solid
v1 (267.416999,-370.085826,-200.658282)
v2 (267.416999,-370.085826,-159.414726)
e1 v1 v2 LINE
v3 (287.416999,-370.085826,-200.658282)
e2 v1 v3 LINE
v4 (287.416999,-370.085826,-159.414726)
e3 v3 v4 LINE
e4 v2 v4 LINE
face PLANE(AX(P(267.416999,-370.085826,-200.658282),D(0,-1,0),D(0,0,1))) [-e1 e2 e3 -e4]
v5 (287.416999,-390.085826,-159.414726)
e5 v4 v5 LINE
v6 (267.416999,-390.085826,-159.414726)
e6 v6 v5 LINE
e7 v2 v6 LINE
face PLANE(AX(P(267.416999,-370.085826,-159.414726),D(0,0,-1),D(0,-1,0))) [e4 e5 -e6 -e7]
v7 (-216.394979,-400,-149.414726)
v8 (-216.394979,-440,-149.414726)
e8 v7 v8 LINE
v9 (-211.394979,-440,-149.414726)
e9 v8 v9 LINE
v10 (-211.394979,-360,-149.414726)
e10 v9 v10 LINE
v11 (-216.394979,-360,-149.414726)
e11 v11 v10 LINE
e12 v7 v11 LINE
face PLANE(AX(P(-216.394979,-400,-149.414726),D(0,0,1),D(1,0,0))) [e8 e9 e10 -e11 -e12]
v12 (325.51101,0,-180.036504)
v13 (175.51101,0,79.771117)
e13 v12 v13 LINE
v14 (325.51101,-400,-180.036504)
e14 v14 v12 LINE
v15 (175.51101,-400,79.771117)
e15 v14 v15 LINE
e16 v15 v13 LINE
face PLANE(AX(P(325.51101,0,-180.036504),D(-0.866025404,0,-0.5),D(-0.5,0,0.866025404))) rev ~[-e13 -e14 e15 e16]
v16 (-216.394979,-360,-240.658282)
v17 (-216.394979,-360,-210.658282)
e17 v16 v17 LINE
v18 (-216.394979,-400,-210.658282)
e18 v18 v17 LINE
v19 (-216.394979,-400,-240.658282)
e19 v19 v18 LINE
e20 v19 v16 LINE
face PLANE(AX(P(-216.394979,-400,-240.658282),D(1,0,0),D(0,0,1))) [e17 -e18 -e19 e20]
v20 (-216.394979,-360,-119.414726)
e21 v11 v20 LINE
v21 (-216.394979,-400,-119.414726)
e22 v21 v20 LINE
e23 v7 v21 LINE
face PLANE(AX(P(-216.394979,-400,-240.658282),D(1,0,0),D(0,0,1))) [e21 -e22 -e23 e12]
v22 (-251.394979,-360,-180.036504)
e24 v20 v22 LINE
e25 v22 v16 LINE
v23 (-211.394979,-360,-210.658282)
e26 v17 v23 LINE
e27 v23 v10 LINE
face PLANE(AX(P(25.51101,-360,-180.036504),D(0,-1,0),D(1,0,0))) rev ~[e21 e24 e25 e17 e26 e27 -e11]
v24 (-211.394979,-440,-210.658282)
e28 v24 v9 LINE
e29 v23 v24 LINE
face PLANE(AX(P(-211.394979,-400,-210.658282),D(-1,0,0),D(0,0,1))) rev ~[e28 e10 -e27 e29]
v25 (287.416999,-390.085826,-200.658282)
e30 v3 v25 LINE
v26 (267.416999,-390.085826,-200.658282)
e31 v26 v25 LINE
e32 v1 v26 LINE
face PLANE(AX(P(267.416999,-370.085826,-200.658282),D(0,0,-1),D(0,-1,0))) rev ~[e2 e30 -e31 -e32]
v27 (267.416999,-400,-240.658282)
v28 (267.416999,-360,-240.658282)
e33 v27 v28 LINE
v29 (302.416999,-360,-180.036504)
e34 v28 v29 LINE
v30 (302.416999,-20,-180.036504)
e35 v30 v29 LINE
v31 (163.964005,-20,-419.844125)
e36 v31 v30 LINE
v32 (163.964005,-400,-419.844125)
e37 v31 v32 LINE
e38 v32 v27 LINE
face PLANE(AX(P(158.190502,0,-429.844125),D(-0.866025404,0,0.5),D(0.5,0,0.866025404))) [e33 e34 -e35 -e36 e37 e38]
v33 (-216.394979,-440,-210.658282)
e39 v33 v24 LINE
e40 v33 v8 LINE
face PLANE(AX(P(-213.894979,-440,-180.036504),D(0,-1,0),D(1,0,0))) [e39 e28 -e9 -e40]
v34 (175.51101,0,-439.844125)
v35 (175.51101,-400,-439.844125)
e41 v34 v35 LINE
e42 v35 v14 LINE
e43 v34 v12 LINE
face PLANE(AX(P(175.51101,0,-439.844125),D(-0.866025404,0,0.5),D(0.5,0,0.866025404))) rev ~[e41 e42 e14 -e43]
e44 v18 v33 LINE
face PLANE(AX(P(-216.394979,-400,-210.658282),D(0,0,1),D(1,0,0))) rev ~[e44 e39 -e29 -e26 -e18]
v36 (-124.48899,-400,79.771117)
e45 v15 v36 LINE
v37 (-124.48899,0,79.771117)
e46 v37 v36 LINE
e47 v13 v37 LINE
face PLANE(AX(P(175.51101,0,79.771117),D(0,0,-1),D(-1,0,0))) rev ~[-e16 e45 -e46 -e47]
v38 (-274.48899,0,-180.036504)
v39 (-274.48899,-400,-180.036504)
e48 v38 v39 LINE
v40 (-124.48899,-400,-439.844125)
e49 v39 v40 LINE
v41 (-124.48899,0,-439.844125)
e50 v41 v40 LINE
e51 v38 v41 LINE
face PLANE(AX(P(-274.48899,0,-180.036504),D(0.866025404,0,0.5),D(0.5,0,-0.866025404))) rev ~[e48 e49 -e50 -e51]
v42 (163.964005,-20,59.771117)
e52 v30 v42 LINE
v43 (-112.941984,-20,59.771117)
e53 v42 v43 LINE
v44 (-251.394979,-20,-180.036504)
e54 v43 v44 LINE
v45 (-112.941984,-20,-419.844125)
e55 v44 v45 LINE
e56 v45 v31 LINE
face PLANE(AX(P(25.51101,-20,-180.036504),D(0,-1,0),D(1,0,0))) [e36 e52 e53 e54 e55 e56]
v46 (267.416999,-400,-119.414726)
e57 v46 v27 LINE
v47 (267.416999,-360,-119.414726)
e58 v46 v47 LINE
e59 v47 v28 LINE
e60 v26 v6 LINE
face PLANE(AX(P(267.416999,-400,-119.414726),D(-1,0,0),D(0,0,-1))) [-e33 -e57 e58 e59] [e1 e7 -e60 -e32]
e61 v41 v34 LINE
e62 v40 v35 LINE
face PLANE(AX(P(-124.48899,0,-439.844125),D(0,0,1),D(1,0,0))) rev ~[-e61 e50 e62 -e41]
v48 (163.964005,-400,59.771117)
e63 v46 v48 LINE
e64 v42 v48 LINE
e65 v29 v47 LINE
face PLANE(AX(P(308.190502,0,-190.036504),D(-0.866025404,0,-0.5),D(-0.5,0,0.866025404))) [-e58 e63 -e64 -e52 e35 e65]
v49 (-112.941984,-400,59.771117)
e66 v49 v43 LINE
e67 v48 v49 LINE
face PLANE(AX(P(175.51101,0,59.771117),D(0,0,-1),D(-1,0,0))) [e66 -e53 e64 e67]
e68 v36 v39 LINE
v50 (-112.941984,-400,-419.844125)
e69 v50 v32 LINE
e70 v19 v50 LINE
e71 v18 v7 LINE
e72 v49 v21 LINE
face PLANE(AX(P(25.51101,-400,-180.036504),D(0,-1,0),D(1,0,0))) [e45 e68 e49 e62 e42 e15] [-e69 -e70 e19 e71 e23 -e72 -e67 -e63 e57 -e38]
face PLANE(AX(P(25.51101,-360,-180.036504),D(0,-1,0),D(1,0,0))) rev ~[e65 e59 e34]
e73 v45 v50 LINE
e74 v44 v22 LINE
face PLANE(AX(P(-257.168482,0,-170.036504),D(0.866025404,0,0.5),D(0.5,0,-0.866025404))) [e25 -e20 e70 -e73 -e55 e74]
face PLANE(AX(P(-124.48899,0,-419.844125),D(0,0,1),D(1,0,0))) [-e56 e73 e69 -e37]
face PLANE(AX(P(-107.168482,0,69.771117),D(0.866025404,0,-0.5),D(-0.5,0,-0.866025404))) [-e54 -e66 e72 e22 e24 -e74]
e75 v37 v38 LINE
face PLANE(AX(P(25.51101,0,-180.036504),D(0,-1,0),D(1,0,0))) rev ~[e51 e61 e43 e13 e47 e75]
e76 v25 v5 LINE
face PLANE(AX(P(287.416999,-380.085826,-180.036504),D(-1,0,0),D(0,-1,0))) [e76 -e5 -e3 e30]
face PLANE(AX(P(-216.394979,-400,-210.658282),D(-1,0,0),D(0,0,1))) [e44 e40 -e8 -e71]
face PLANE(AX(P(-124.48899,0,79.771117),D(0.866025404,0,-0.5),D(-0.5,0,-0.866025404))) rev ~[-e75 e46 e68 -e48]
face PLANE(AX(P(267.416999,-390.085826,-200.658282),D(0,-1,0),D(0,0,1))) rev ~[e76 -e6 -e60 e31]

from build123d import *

# Parameters (mm, degrees)
F1_DEPTH  = 400
F2_T      = -20
F4_DEPTH  = 40
F5_W      = 40
F5_H      = 61.2435565298
F6_DEPTH  = 5
F7_W      = 5
F7_H      = 61.2435565298
F8_DEPTH  = 40
F9_W      = 20
F9_H      = 41.2435565298
F10_DEPTH = 20


with BuildPart() as f1:
    # F0 (on Front) → F1 (new body)
    with BuildSketch(Plane.XZ):
        Polygon((175.5110102277, 79.7711170535), (-124.4889897723, 79.7711170535), (-274.4889897723, -180.0365040818), (-124.4889897723, -439.8441252172), (175.5110102277, -439.8441252172), (325.5110102277, -180.0365040818), align=None)
    extrude(amount=F1_DEPTH)

    # F2
    f2_openings = [f1.faces().sort_by_distance(p)[0] for p in [
        (25.51101, -400, -180.036504),
    ]]
    offset(amount=F2_T, openings=f2_openings)

    # F3 (on face) → F4 (join)
    with BuildSketch(Plane.XZ.offset(400)):
        Polygon((175.5110102277, -439.8441252172), (325.5110102277, -180.0365040818), (175.5110102277, 79.7711170535), (-124.4889897723, 79.7711170535), (-274.4889897723, -180.0365040818), (-124.4889897723, -439.8441252172), align=None)
        Polygon((-216.3949790047, -240.6582823468), (-251.3949790047, -180.0365040818), (-216.3949790047, -119.4147258169), (-112.9419843885, 59.7711170535), (163.9640048439, 59.7711170535), (267.4169994601, -119.4147258169), (302.4169994601, -180.0365040818), (267.4169994601, -240.6582823468), (163.9640048439, -419.8441252172), (-112.9419843885, -419.8441252172), align=None, mode=Mode.SUBTRACT)
        Polygon((-216.3949790047, -119.4147258169), (-251.3949790047, -180.0365040818), (-216.3949790047, -240.6582823468), align=None)
        Polygon((302.4169994601, -180.0365040818), (267.4169994601, -119.4147258169), (267.4169994601, -240.6582823468), align=None)
    extrude(amount=-F4_DEPTH)

    # F5 (on face) → F6 (join)
    with BuildSketch(Plane.YZ.offset(-216.3949790047)):
        with Locations((-380, -180.0365040818)):
            Rectangle(F5_W, F5_H)
    extrude(amount=F6_DEPTH)

    # F7 (on face) → F8 (join)
    with BuildSketch(Plane.XZ.offset(400)):
        with Locations((-213.8949790047, -180.0365040818)):
            Rectangle(F7_W, F7_H)
    extrude(amount=F8_DEPTH)

    # F9 (on face) → F10 (cut)
    with BuildSketch(Plane(origin=(267.4169994601, 0, 0), x_dir=(0, -1, 0), z_dir=(-1, 0, 0))):
        with Locations((380.0858259201, -180.0365040818)):
            Rectangle(F9_W, F9_H)
    extrude(amount=-F10_DEPTH, mode=Mode.SUBTRACT)


solid = f1.part
